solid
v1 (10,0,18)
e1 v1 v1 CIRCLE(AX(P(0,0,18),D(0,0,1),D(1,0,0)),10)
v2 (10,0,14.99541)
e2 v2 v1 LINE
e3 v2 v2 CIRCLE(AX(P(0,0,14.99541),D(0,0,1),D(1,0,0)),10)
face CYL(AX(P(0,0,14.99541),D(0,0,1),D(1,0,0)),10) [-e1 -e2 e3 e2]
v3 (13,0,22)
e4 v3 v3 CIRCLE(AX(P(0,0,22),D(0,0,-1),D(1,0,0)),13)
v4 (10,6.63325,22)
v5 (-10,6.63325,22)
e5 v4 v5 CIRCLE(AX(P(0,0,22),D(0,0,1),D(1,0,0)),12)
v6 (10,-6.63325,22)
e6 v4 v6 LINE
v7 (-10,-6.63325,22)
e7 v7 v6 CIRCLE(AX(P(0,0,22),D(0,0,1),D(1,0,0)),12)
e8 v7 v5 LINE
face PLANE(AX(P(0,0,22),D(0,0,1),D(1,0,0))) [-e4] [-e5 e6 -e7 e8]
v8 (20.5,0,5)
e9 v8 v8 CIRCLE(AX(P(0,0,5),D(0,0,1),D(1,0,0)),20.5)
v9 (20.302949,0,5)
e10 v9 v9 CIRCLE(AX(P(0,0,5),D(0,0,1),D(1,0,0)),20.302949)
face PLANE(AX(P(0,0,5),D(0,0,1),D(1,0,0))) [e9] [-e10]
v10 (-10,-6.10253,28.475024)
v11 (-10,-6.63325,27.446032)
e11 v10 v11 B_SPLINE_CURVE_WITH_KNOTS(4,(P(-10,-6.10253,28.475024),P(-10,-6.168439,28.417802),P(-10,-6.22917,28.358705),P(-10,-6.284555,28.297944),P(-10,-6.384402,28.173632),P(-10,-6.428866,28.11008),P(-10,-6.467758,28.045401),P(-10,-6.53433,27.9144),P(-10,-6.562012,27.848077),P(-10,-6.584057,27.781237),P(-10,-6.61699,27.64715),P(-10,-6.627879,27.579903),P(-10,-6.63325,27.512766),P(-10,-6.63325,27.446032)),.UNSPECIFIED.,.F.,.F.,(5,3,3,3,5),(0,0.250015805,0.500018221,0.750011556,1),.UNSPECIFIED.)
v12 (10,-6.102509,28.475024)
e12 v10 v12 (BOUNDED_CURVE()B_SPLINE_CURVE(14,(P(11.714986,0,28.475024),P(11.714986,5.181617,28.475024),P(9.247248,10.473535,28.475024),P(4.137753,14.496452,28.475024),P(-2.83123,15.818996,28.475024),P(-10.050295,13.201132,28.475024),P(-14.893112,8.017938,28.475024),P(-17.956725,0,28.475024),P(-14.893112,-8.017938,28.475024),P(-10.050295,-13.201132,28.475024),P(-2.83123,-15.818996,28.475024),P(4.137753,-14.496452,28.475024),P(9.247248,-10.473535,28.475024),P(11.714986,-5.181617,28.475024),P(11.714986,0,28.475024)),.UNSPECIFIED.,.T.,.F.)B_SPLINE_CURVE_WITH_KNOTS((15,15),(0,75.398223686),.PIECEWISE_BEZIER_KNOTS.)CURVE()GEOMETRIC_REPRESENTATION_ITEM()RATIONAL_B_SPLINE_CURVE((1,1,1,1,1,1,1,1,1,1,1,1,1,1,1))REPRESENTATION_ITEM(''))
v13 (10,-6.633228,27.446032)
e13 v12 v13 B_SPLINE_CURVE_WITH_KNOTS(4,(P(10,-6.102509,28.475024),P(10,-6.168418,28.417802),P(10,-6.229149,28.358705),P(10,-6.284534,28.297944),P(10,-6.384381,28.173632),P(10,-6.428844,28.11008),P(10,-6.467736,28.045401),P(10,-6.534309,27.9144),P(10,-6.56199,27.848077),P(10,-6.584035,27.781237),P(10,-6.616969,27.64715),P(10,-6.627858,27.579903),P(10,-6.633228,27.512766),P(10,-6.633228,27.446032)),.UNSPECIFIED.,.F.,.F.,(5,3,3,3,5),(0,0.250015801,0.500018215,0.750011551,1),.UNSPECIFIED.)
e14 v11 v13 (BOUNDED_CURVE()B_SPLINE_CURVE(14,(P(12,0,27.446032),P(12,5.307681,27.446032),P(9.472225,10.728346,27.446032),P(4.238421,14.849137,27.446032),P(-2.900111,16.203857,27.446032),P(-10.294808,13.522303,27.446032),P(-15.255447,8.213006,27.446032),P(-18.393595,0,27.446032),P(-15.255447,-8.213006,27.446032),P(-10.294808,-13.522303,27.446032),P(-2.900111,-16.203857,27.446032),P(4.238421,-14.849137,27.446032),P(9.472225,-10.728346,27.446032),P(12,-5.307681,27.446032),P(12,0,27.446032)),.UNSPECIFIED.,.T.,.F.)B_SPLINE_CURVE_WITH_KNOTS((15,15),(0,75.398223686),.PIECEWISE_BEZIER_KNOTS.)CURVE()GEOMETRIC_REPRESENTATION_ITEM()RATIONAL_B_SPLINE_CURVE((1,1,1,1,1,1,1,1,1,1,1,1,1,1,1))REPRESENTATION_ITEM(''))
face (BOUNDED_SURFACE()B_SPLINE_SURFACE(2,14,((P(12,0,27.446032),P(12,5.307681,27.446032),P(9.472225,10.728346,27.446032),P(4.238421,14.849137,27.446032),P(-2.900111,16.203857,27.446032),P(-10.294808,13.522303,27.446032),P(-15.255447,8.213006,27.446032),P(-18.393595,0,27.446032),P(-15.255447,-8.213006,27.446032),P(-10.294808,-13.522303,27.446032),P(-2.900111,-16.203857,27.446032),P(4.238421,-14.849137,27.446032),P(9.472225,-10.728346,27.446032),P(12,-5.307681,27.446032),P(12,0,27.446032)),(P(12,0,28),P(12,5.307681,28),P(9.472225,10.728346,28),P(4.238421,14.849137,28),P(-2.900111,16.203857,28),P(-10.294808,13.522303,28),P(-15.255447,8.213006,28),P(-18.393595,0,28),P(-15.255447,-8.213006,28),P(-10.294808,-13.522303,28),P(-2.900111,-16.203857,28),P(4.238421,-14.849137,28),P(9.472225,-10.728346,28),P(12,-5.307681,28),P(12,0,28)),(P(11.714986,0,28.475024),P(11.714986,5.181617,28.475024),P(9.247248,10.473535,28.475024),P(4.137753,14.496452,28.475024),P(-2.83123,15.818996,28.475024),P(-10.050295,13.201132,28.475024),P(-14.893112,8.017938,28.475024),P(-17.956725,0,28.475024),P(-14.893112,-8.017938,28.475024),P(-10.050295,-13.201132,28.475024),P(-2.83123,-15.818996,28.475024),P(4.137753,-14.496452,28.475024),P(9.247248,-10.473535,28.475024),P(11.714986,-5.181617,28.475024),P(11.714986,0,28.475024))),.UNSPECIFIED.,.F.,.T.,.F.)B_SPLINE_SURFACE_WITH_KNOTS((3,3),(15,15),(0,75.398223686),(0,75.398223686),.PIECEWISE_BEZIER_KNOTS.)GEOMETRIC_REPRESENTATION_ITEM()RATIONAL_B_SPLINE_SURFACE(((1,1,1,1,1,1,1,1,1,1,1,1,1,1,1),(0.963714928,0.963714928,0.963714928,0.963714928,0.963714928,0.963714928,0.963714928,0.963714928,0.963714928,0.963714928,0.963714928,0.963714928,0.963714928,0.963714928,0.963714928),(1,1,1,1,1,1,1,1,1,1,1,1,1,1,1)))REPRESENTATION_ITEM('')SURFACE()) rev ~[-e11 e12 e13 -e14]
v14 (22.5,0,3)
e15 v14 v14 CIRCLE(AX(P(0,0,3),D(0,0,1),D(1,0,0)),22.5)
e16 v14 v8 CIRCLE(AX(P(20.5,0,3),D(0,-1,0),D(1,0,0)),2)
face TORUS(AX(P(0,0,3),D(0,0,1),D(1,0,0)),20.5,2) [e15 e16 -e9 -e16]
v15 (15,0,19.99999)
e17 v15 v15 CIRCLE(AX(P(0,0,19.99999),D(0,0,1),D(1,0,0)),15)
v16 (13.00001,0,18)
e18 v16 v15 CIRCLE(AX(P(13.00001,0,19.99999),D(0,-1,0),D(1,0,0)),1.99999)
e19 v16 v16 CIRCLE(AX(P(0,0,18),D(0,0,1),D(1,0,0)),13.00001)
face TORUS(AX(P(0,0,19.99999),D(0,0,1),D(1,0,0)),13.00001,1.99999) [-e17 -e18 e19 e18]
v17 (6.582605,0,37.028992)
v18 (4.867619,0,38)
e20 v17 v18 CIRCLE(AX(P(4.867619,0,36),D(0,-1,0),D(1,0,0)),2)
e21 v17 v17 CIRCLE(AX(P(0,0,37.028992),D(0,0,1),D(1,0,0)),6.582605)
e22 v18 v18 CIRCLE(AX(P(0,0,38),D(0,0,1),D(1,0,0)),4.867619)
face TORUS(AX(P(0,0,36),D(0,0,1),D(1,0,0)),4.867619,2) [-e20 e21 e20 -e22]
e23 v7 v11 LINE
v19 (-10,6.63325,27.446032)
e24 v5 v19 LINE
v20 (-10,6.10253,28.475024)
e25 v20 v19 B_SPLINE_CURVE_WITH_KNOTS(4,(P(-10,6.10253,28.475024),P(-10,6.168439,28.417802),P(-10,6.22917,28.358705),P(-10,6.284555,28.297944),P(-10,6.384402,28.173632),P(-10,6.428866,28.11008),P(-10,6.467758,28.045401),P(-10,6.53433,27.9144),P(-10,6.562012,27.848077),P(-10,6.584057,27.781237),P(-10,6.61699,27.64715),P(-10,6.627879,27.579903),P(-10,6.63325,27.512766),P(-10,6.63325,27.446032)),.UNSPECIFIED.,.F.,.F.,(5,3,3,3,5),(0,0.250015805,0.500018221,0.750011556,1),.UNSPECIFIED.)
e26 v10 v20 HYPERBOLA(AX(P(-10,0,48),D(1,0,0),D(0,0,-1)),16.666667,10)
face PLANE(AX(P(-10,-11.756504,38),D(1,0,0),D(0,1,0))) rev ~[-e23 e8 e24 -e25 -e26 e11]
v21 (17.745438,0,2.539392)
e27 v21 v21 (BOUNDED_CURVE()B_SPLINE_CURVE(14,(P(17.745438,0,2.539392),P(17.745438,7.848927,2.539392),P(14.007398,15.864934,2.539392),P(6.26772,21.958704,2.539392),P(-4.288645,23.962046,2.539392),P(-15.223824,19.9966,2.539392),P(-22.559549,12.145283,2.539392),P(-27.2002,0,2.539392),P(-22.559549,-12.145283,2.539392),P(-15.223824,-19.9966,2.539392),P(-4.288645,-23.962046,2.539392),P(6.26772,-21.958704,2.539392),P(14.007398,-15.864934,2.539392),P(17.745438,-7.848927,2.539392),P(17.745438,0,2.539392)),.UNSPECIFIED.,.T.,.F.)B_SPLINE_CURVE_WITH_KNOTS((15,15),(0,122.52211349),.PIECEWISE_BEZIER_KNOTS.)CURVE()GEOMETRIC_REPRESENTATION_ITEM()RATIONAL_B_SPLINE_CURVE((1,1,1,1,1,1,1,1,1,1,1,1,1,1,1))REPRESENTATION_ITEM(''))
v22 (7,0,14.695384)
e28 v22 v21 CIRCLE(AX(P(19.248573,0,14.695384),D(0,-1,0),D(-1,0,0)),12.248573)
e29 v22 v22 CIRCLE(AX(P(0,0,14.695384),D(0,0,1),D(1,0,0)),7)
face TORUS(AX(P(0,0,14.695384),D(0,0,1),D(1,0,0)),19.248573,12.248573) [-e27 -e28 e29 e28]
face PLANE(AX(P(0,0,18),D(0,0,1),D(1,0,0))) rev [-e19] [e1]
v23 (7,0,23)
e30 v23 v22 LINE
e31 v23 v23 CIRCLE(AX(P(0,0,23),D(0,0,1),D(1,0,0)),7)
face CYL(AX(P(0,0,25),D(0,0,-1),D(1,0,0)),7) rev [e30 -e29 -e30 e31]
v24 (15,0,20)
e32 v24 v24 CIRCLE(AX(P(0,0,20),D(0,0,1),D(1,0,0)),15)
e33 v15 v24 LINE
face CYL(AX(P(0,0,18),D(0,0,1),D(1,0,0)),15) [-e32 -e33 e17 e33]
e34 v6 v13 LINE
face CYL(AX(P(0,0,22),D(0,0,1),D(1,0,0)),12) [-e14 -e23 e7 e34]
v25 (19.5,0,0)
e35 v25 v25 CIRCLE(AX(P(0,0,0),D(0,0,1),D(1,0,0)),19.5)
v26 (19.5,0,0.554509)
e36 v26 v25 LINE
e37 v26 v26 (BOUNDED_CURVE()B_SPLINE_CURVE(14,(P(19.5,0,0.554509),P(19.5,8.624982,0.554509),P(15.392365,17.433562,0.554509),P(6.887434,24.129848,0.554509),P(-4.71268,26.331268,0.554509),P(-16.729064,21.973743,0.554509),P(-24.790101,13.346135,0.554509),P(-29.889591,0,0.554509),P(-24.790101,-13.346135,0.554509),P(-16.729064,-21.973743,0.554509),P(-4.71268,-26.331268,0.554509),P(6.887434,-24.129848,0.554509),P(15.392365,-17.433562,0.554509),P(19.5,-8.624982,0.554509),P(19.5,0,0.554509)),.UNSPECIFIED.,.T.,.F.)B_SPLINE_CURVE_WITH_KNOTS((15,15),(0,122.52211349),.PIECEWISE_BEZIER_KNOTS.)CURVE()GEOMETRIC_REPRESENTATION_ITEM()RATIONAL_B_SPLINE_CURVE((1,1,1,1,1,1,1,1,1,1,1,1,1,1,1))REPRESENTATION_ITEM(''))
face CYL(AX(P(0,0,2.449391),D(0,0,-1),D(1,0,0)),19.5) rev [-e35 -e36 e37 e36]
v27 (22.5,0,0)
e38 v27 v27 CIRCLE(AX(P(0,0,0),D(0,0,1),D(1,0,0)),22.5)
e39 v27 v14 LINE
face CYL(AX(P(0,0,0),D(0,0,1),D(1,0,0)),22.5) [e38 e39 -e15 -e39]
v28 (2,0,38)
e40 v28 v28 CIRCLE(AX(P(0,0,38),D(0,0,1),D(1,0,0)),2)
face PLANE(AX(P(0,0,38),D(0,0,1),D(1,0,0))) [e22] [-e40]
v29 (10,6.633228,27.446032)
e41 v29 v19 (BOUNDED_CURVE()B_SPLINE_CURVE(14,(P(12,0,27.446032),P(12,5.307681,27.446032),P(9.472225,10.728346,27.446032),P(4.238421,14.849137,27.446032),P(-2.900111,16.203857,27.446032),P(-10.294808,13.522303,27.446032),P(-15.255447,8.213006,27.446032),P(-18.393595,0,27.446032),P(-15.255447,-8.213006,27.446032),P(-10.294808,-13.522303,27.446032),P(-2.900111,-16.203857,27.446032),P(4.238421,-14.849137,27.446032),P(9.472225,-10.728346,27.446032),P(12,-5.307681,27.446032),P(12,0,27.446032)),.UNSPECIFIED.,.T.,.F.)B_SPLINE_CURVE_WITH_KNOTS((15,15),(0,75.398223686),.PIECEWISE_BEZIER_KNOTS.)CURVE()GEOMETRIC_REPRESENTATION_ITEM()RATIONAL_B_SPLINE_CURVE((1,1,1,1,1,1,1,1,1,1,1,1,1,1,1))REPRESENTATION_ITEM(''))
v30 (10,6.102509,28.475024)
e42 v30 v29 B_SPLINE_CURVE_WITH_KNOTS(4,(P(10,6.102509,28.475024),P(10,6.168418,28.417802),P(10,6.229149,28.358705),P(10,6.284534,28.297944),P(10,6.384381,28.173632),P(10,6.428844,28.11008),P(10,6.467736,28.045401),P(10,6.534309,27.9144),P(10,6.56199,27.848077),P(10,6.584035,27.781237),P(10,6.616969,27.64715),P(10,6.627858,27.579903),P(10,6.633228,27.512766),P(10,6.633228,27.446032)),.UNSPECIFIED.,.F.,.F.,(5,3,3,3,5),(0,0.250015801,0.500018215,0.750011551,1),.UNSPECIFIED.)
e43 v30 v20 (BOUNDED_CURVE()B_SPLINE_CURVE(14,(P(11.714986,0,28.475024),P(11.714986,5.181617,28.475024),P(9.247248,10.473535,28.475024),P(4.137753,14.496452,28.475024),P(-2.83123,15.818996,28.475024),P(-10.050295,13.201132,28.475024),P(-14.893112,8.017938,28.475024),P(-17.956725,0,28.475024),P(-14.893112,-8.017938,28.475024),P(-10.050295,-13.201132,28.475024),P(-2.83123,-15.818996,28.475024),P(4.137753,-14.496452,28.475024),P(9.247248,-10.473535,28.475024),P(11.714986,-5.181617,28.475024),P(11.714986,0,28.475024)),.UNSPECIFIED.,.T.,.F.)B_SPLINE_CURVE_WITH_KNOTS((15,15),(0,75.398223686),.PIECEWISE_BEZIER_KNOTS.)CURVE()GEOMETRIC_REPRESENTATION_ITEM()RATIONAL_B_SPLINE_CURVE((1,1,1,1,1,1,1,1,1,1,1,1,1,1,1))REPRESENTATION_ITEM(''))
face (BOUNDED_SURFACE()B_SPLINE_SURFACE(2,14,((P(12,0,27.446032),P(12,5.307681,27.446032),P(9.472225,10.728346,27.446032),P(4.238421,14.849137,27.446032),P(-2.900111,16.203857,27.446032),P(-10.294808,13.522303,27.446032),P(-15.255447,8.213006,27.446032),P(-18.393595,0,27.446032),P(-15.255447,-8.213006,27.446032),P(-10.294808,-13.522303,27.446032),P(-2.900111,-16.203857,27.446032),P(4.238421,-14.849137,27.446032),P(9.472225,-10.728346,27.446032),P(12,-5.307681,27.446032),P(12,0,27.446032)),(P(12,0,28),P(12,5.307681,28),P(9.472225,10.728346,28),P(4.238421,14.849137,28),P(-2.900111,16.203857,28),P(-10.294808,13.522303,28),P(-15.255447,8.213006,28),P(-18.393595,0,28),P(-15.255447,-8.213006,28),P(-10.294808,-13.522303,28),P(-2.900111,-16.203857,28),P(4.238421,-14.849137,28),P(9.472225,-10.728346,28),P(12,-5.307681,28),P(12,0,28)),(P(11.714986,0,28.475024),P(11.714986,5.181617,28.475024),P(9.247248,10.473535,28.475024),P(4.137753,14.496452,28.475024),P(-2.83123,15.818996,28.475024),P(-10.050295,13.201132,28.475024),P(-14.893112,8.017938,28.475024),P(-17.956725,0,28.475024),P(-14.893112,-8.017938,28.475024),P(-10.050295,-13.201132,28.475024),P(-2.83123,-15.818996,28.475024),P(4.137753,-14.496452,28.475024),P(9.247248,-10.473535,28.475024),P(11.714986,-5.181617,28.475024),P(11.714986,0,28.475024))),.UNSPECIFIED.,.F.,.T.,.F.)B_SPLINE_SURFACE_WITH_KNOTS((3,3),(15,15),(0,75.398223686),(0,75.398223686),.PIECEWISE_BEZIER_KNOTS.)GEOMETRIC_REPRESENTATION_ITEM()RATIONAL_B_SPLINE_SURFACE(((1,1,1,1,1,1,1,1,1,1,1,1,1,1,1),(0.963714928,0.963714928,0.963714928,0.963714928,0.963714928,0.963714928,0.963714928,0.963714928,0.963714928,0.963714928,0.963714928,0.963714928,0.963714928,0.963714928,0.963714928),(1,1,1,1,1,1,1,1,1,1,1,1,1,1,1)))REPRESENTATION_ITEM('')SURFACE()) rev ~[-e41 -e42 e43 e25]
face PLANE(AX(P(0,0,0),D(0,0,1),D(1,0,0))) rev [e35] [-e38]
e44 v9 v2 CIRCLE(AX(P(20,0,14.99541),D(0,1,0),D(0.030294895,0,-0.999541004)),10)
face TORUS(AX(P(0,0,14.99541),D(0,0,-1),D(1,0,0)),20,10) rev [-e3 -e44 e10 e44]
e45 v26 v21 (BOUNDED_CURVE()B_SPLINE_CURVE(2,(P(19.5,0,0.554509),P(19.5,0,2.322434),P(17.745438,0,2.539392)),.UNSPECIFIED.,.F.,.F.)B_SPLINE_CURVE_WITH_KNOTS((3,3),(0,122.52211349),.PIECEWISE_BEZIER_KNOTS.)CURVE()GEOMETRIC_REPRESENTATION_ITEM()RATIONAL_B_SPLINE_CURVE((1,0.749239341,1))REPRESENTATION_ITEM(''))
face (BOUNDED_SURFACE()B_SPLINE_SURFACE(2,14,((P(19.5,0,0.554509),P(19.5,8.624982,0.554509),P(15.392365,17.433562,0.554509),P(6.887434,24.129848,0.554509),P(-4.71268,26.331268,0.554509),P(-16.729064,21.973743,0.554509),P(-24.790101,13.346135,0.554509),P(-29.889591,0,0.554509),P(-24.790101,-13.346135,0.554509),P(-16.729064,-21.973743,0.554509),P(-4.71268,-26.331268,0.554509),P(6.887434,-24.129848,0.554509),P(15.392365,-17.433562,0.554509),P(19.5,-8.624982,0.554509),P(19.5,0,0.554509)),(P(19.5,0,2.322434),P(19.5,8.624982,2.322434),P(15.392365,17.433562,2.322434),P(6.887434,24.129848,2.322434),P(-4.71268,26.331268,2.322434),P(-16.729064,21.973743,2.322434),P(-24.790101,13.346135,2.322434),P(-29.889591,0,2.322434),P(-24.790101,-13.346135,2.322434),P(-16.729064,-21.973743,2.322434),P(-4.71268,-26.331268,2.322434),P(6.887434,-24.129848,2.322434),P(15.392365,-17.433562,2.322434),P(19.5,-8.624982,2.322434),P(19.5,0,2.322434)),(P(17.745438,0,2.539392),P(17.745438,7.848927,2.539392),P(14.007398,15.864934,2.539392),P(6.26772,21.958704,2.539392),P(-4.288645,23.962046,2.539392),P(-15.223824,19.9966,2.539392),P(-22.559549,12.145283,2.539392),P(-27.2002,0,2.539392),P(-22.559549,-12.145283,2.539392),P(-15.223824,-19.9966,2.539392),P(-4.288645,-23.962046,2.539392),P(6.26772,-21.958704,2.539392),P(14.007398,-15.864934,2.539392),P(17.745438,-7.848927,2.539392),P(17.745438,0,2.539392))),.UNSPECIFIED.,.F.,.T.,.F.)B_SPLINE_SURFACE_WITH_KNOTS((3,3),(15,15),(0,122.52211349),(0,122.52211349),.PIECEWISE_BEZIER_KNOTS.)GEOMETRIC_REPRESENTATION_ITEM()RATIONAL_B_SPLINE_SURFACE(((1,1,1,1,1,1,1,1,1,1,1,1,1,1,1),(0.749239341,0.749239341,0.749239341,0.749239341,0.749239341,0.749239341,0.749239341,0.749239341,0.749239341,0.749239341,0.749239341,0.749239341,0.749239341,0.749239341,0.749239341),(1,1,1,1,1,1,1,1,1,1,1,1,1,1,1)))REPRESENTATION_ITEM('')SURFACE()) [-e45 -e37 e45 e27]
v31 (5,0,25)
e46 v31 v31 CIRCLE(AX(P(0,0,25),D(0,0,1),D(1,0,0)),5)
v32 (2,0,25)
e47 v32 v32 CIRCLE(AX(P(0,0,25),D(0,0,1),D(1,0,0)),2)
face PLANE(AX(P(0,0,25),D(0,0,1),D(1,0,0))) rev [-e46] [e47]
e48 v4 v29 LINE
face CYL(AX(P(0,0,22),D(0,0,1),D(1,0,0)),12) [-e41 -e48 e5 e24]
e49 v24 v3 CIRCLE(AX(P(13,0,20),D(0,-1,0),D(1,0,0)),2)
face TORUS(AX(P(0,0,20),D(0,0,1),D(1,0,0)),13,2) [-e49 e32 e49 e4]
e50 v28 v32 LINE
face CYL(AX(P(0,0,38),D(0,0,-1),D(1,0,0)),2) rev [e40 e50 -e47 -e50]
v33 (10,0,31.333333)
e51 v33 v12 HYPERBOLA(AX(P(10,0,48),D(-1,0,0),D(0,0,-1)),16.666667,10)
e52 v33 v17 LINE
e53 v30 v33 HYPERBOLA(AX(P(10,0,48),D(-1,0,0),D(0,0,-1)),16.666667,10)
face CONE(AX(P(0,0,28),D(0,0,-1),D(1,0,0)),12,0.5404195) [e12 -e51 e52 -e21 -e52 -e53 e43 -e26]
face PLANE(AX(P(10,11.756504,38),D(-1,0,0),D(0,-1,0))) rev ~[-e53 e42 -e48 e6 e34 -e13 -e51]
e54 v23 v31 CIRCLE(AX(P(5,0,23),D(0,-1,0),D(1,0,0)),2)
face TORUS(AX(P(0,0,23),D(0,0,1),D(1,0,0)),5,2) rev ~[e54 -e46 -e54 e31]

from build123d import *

# Parameters (mm, degrees)
F2_R     = 2
F3_R     = 2
F5_DEPTH = 16
F6_R     = 1.99999


# Not quite as in the source:
# - a fillet or chamfer is up to 0.001 mm smaller than in the source, because OpenCascade refuses the exact size


with BuildPart() as f1:
    # F0 (on Front) → F1 (revolve)
    with BuildSketch(Plane.XZ):
        with BuildLine():
            Line((19.5, 2.4493911769), (19.5, 0))
            Line((19.5, 0), (22.5, 0))
            Line((22.5, 0), (22.5, 5))
            Line((22.5, 5), (20.3029489522, 5))
            ThreePointArc((20.3029489522, 5), (13.036864554, 7.8180327534), (10, 14.9954100432))
            Line((10, 14.9954100432), (10, 18))
            Line((10, 18), (15, 18))
            Line((15, 18), (15, 22))
            Line((15, 22), (12, 22))
            Line((12, 22), (12, 28))
            Line((12, 28), (6, 38))
            Line((6, 38), (2, 38))
            Line((2, 38), (2, 25))
            Line((2, 25), (7, 25))
            Line((7, 25), (7, 14.6953836083))
            ThreePointArc((7, 14.6953836083), (10.6768777456, 5.9458931856), (19.5, 2.4493911769))
        make_face()
    revolve(axis=Axis((0, 0, 19), (0, 0, 1)))

    # F2
    f2_edges = [f1.edges().sort_by_distance(p)[0] for p in [
        (-6, 0, 38),
        (-12, 0, 28),
        (-15, 0, 22),
        (-22.5, 0, 5),
    ]]
    fillet(f2_edges, radius=F2_R)

    # F3
    f3_edges = [f1.edges().sort_by_distance(p)[0] for p in [
        (-7, 0, 25),
        (-19.5, 0, 2.449391),
    ]]
    fillet(f3_edges, radius=F3_R)

    # F4 (on face) → F5 (cut)
    with BuildSketch(Plane.XY.offset(38)):
        with BuildLine():
            Line((-10, -11.7565038997), (-10, 11.7565038997))
            ThreePointArc((-10, 11.7565038997), (-15.4342276756, 0), (-10, -11.7565038997))
        make_face()
        with BuildLine():
            ThreePointArc((10, -11.7565038997), (14.0099546876, -6.4758438518), (15.4342276756, 0))
            ThreePointArc((15.4342276756, 0), (14.0099546876, 6.4758438518), (10, 11.7565038997))
            Line((10, 11.7565038997), (10, -11.7565038997))
        make_face()
    extrude(amount=-F5_DEPTH, mode=Mode.SUBTRACT)

    # F6 (radius 2 in the source; OpenCascade refuses exactly that, so slightly less here)
    f6_edges = [f1.edges().sort_by_distance(p)[0] for p in [
        (-15, 0, 18),
    ]]
    fillet(f6_edges, radius=F6_R)


solid = f1.part
